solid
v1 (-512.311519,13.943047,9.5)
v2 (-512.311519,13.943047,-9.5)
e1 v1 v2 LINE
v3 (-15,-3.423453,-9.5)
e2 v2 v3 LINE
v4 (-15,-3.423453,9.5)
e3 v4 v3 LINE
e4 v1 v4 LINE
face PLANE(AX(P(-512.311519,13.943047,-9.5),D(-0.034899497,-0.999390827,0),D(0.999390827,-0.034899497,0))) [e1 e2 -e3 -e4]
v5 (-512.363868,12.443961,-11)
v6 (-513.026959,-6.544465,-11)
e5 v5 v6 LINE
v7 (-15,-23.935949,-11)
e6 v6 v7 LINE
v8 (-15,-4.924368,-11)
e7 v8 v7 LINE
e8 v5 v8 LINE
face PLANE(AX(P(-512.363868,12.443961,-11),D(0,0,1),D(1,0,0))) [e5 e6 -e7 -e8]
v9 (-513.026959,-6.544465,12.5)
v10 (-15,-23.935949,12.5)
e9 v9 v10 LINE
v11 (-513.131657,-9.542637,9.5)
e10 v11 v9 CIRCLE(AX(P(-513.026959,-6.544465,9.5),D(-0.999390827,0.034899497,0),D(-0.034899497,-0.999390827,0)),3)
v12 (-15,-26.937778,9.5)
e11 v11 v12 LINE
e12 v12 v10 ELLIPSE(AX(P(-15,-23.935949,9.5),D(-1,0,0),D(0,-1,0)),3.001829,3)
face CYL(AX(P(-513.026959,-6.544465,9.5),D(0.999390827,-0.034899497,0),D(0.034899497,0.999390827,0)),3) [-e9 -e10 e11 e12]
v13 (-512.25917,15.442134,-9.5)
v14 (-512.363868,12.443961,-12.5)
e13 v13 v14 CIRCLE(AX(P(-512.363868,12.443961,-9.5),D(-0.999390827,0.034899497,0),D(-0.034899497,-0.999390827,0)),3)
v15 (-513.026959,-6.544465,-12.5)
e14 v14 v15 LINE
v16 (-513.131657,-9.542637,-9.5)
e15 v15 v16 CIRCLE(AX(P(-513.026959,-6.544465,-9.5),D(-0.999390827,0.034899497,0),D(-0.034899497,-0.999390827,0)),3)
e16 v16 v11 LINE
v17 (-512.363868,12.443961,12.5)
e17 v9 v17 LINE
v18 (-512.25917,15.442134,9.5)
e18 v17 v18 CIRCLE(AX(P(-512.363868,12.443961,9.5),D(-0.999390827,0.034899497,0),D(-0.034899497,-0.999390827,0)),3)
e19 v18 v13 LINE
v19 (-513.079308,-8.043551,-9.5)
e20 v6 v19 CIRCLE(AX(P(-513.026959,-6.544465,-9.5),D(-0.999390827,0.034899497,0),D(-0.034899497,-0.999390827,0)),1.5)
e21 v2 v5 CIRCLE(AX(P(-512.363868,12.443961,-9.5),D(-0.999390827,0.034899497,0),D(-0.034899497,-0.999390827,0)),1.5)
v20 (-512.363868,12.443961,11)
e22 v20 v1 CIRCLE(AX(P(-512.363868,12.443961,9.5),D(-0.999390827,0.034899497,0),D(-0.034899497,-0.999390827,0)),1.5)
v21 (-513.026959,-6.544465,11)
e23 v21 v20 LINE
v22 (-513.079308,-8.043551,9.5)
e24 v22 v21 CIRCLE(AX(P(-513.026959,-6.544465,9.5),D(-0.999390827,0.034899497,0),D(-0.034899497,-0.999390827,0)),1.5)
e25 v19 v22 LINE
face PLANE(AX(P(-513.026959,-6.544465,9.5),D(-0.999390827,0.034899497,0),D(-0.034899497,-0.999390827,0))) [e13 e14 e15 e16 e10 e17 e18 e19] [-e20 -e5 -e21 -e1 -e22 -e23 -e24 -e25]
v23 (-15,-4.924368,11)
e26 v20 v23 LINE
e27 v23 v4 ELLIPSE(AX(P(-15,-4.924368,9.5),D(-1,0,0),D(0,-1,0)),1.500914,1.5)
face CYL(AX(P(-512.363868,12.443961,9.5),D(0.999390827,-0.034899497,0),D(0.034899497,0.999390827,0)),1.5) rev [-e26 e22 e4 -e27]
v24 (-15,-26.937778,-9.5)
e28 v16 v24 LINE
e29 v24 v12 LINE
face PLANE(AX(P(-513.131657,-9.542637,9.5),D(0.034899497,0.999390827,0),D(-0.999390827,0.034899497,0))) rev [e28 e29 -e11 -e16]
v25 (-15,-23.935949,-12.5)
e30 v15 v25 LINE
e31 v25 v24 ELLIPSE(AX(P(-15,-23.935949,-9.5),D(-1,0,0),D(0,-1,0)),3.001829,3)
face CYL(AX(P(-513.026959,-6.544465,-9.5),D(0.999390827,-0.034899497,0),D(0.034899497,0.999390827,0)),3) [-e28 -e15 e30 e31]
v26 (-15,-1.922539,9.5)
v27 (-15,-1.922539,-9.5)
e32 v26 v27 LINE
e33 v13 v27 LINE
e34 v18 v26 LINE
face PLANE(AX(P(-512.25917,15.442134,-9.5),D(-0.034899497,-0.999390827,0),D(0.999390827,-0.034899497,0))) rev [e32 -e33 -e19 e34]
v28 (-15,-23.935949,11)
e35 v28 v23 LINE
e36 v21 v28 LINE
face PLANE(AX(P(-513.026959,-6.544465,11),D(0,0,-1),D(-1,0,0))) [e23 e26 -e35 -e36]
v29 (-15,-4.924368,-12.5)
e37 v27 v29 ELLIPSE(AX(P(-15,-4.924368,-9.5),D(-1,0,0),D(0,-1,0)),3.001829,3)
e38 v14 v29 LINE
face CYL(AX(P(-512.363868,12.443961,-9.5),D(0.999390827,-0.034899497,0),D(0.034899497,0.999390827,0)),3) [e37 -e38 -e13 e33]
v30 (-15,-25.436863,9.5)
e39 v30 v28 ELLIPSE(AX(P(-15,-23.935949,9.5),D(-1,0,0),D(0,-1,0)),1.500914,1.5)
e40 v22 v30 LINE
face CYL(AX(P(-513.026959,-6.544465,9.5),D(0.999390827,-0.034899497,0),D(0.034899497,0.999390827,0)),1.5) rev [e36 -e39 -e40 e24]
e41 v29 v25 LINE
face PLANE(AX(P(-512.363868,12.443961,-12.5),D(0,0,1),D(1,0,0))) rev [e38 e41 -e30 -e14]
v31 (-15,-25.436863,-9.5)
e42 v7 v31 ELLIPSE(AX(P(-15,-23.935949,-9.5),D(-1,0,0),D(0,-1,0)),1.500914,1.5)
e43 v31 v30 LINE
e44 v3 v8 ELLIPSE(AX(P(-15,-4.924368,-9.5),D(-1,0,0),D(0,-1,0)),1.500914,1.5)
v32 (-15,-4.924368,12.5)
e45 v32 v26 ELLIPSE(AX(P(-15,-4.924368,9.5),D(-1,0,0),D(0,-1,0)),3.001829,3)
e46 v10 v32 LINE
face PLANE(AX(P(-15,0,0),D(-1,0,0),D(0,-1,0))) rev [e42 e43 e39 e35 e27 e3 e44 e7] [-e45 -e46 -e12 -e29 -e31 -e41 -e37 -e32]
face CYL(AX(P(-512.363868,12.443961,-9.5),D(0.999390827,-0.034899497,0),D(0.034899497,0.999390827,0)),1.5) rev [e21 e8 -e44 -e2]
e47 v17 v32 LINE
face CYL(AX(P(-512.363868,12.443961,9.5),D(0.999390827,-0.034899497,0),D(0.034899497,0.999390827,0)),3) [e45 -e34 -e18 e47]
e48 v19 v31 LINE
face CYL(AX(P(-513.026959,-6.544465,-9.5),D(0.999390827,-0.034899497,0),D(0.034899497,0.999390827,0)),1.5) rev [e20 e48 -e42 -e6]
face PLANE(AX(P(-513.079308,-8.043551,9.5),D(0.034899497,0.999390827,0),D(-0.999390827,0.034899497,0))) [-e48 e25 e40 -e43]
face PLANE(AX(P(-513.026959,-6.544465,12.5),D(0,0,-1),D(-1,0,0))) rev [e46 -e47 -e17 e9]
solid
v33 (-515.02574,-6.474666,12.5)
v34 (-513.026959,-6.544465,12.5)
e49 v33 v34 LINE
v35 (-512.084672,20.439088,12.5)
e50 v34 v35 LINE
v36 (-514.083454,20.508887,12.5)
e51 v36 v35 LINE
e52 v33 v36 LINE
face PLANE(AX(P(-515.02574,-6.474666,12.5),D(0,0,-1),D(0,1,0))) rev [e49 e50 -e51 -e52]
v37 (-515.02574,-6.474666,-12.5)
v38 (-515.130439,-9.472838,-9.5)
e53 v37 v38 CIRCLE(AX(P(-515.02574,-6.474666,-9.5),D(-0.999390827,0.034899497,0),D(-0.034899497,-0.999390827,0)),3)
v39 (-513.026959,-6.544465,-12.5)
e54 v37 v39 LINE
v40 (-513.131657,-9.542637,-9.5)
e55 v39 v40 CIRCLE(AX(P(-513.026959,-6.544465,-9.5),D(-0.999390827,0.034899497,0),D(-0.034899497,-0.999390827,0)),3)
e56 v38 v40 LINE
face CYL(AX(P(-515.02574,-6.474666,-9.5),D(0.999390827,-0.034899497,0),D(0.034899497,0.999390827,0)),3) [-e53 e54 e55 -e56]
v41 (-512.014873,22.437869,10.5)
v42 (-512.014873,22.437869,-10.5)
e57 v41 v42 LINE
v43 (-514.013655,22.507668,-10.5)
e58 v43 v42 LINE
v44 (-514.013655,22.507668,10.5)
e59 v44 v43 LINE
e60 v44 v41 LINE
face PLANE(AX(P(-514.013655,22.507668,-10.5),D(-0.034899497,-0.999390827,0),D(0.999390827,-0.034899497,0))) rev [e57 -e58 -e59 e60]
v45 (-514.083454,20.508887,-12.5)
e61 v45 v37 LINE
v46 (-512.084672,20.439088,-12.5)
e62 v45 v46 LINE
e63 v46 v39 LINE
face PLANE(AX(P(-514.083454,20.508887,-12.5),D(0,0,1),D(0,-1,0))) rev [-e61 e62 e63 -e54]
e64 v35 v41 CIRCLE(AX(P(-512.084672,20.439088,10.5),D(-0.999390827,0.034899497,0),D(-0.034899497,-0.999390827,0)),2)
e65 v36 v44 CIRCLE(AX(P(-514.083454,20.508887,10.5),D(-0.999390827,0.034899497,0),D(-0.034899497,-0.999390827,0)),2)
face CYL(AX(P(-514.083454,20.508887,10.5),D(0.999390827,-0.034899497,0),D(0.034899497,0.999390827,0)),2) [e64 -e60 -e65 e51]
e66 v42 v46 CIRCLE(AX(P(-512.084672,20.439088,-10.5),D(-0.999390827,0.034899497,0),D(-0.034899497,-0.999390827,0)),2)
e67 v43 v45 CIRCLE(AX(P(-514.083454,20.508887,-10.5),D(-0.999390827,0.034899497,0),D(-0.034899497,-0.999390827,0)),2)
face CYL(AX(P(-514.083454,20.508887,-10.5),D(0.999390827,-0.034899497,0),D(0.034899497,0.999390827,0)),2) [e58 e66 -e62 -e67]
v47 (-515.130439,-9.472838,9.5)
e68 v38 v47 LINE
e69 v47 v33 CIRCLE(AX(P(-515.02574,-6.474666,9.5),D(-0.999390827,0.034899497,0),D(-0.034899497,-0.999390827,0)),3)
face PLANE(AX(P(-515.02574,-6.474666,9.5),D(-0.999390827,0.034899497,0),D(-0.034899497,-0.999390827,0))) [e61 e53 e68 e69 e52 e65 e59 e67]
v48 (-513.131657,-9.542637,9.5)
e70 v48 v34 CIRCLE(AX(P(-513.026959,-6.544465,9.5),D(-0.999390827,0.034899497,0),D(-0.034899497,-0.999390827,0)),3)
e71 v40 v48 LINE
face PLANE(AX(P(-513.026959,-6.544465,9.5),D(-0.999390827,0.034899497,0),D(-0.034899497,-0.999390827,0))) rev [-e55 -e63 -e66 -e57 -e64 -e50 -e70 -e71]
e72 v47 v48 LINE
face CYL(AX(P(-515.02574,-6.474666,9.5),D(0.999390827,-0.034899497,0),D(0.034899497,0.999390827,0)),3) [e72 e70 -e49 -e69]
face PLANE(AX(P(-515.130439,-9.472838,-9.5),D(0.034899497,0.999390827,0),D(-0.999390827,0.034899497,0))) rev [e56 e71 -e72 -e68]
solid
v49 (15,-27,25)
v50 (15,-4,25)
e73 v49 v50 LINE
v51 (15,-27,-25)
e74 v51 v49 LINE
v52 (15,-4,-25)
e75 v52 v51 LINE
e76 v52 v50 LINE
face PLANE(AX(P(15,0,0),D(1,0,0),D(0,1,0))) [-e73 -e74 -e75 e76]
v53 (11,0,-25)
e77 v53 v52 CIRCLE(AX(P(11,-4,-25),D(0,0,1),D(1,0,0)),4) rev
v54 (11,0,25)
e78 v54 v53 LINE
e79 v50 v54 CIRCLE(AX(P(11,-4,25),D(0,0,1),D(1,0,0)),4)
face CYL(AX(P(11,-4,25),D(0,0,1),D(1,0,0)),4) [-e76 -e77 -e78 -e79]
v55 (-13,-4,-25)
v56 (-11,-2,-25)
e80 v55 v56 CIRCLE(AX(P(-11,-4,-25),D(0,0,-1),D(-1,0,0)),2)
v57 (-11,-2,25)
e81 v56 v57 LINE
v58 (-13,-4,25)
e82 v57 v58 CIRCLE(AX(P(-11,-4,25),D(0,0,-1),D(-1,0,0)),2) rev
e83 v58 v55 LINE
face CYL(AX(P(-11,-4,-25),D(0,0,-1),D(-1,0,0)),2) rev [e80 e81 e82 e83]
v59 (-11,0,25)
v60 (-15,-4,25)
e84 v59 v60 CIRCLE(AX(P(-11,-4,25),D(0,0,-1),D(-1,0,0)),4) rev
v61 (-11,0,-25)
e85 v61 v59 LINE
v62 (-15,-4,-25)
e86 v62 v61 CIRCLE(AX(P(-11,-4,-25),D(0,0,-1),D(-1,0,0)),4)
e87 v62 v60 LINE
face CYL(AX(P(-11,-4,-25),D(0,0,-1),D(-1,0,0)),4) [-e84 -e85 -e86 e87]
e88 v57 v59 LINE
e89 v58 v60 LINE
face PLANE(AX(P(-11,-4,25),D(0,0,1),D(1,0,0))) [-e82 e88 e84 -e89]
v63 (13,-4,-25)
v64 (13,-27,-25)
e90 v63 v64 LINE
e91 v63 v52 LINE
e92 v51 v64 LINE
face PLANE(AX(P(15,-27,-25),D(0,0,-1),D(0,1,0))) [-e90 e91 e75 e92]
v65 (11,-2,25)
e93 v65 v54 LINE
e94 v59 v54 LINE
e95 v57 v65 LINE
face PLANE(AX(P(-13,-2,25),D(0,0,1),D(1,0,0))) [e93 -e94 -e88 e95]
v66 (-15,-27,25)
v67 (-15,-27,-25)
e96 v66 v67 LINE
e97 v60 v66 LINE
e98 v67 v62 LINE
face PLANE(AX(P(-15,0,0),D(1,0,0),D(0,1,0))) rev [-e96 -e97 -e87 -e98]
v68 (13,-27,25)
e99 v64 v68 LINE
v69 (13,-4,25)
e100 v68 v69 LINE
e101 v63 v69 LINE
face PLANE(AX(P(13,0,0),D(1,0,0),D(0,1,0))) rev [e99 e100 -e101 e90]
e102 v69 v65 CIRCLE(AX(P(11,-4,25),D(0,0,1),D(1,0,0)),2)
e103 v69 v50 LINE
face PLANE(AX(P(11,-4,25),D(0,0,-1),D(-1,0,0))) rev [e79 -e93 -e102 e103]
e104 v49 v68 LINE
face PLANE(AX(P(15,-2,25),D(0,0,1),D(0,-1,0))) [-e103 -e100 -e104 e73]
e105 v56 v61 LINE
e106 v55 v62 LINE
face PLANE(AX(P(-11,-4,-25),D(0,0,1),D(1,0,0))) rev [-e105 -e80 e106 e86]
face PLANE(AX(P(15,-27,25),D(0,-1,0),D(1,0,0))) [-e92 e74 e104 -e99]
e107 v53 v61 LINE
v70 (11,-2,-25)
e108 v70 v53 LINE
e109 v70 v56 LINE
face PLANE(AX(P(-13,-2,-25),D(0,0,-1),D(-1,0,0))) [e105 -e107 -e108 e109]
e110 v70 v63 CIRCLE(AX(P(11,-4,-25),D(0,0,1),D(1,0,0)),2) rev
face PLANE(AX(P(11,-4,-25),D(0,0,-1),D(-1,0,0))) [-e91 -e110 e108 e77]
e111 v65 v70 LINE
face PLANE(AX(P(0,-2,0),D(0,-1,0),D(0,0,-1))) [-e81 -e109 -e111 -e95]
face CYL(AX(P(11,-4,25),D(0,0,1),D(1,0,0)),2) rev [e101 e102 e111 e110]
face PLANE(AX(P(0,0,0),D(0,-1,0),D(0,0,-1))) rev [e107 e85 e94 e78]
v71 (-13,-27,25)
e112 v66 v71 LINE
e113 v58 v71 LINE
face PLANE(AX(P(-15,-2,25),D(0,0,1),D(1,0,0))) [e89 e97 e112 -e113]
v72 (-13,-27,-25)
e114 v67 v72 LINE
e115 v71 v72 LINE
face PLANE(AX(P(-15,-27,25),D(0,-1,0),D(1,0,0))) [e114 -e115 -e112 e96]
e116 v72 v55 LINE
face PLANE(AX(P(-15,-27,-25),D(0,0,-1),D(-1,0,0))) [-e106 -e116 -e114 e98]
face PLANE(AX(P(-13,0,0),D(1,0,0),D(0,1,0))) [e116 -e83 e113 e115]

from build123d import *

# Parameters (mm, degrees)
SKETCH_1_W                     = 26
SKETCH_1_H                     = 50
SM_BASE_FLANGE_1_DEPTH         = 2
EDGE_FLANGE1_STRIP_W           = 12
EDGE_FLANGE1_STRIP_H           = 2
EDGE_FLANGE1_STRIP_CUT_DEPTH   = 50
EDGE_FLANGE1_STRIP_2_W         = 12
EDGE_FLANGE1_STRIP_2_H         = 2
EDGE_FLANGE1_STRIP_CUT_2_DEPTH = 50
EDGE_FLANGE1_DEPTH             = 50
EDGE_FLANGE1_BEND_DEPTH        = 50
F_2_X_2_X_0_25_1_DEPTH         = 500
SKETCH_15_W                    = 53.141638299
SKETCH_15_H                    = 32.279440364
CUT_EXTRUDE_1_DEPTH            = 500.488886686
EXTRUDE_2_DEPTH                = 2


# Sheet-metal steps are written as plain solids
with BuildPart() as part:
    # Эскиз1 → Базовая кромка1 (new body)
    with BuildSketch(Plane(origin=(0, 0, 0), x_dir=(1, 0, 0), z_dir=(0, 1, 0))):
        Rectangle(SKETCH_1_W, SKETCH_1_H)
    extrude(amount=-SM_BASE_FLANGE_1_DEPTH)

    # Edge-Flange1 strip (across the edge) → Edge-Flange1 strip cut (cut)
    with BuildSketch(Plane(origin=(13, -2, -25), x_dir=(-1, 0, 0), z_dir=(0, 0, 1))):
        with Locations((-4, -1)):
            Rectangle(EDGE_FLANGE1_STRIP_W, EDGE_FLANGE1_STRIP_H)
    extrude(amount=EDGE_FLANGE1_STRIP_CUT_DEPTH, mode=Mode.SUBTRACT)

    # Edge-Flange1 strip 2 (across the edge) → Edge-Flange1 strip cut 2 (cut)
    with BuildSketch(Plane(origin=(-13, -2, 25), x_dir=(1, 0, 0), z_dir=(0, 0, -1))):
        with Locations((-4, -1)):
            Rectangle(EDGE_FLANGE1_STRIP_2_W, EDGE_FLANGE1_STRIP_2_H)
    extrude(amount=EDGE_FLANGE1_STRIP_CUT_2_DEPTH, mode=Mode.SUBTRACT)

    # Edge-Flange1 section (across the edge) → Edge-Flange1 (add)
    with BuildSketch(Plane(origin=(13, -2, -25), x_dir=(-1, 0, 0), z_dir=(0, 0, 1))):
        with BuildLine():
            Line((-2, 2), (-2, 25))
            Line((-2, 25), (0, 25))
            Line((0, 25), (0, 2))
            ThreePointArc((0, 2), (0.585786438, 0.585786438), (2, 0))
            Line((2, 0), (2, -2))
            ThreePointArc((2, -2), (-0.828427125, -0.828427125), (-2, 2))
        make_face()
    extrude(amount=EDGE_FLANGE1_DEPTH)

    # Edge-Flange1 section 2 (across the edge) → Edge-Flange1 bend (add)
    with BuildSketch(Plane(origin=(-13, -2, 25), x_dir=(1, 0, 0), z_dir=(0, 0, -1))):
        with BuildLine():
            Line((-2, 2), (-2, 25))
            Line((-2, 25), (0, 25))
            Line((0, 25), (0, 2))
            ThreePointArc((0, 2), (0.585786438, 0.585786438), (2, 0))
            Line((2, 0), (2, -2))
            ThreePointArc((2, -2), (-0.828427125, -0.828427125), (-2, 2))
        make_face()
    extrude(amount=EDGE_FLANGE1_BEND_DEPTH)


with BuildPart() as body_2:
    # Sketch1 → Квадратная труба 2 X 2 X 0.25(1) (new body)
    with BuildSketch(Plane(origin=(-13, -14.5, 0), x_dir=(-0.03489949670250092, -0.9993908270190959, 0), z_dir=(-0.9993908270190959, 0.03489949670250092, 0))):
        with BuildLine():
            Line((-9.5, -12.5), (9.5, -12.5))
            ThreePointArc((9.5, -12.5), (11.621320344, -11.621320344), (12.5, -9.5))
            Line((12.5, -9.5), (12.5, 9.5))
            ThreePointArc((12.5, 9.5), (11.621320344, 11.621320344), (9.5, 12.5))
            Line((9.5, 12.5), (-9.5, 12.5))
            ThreePointArc((-9.5, 12.5), (-11.621320344, 11.621320344), (-12.5, 9.5))
            Line((-12.5, 9.5), (-12.5, -9.5))
            ThreePointArc((-12.5, -9.5), (-11.621320344, -11.621320344), (-9.5, -12.5))
        make_face()
        with BuildLine():
            Line((-9.5, -11), (9.5, -11))
            ThreePointArc((9.5, -11), (10.560660172, -10.560660172), (11, -9.5))
            Line((11, -9.5), (11, 9.5))
            ThreePointArc((11, 9.5), (10.560660172, 10.560660172), (9.5, 11))
            Line((9.5, 11), (-9.5, 11))
            ThreePointArc((-9.5, 11), (-10.560660172, 10.560660172), (-11, 9.5))
            Line((-11, 9.5), (-11, -9.5))
            ThreePointArc((-11, -9.5), (-10.560660172, -10.560660172), (-9.5, -11))
        make_face(mode=Mode.SUBTRACT)
    extrude(amount=F_2_X_2_X_0_25_1_DEPTH)

    # Эскиз15 → Вырез-Вытянуть1 (cut, through all)
    with BuildSketch(Plane.ZY.offset(15)):
        with Locations((-5.765575738, -15.221763434)):
            Rectangle(SKETCH_15_W, SKETCH_15_H)
    extrude(amount=-CUT_EXTRUDE_1_DEPTH, mode=Mode.SUBTRACT)


with BuildPart() as body_3:
    # Эскиз16 → Бобышка-Вытянуть2 (new body)
    with BuildSketch(Plane(origin=(-512.173845402, 17.885504795, 0), x_dir=(0, 0, 1), z_dir=(-0.9993908270190958, 0.034899496702500934, 0))):
        with BuildLine():
            Line((-10.5, 4.555139551), (10.5, 4.555139551))
            ThreePointArc((10.5, 4.555139551), (11.914213562, 3.969353113), (12.5, 2.555139551))
            Line((12.5, 2.555139551), (12.5, -24.444860449))
            ThreePointArc((12.5, -24.444860449), (11.621320344, -26.566180792), (9.5, -27.444860449))
            Line((9.5, -27.444860449), (-9.5, -27.444860449))
            ThreePointArc((-9.5, -27.444860449), (-11.621320344, -26.566180792), (-12.5, -24.444860449))
            Line((-12.5, -24.444860449), (-12.5, 2.555139551))
            ThreePointArc((-12.5, 2.555139551), (-11.914213562, 3.969353113), (-10.5, 4.555139551))
        make_face()
    extrude(amount=EXTRUDE_2_DEPTH)


solid = Compound([part.part, body_2.part, body_3.part])
